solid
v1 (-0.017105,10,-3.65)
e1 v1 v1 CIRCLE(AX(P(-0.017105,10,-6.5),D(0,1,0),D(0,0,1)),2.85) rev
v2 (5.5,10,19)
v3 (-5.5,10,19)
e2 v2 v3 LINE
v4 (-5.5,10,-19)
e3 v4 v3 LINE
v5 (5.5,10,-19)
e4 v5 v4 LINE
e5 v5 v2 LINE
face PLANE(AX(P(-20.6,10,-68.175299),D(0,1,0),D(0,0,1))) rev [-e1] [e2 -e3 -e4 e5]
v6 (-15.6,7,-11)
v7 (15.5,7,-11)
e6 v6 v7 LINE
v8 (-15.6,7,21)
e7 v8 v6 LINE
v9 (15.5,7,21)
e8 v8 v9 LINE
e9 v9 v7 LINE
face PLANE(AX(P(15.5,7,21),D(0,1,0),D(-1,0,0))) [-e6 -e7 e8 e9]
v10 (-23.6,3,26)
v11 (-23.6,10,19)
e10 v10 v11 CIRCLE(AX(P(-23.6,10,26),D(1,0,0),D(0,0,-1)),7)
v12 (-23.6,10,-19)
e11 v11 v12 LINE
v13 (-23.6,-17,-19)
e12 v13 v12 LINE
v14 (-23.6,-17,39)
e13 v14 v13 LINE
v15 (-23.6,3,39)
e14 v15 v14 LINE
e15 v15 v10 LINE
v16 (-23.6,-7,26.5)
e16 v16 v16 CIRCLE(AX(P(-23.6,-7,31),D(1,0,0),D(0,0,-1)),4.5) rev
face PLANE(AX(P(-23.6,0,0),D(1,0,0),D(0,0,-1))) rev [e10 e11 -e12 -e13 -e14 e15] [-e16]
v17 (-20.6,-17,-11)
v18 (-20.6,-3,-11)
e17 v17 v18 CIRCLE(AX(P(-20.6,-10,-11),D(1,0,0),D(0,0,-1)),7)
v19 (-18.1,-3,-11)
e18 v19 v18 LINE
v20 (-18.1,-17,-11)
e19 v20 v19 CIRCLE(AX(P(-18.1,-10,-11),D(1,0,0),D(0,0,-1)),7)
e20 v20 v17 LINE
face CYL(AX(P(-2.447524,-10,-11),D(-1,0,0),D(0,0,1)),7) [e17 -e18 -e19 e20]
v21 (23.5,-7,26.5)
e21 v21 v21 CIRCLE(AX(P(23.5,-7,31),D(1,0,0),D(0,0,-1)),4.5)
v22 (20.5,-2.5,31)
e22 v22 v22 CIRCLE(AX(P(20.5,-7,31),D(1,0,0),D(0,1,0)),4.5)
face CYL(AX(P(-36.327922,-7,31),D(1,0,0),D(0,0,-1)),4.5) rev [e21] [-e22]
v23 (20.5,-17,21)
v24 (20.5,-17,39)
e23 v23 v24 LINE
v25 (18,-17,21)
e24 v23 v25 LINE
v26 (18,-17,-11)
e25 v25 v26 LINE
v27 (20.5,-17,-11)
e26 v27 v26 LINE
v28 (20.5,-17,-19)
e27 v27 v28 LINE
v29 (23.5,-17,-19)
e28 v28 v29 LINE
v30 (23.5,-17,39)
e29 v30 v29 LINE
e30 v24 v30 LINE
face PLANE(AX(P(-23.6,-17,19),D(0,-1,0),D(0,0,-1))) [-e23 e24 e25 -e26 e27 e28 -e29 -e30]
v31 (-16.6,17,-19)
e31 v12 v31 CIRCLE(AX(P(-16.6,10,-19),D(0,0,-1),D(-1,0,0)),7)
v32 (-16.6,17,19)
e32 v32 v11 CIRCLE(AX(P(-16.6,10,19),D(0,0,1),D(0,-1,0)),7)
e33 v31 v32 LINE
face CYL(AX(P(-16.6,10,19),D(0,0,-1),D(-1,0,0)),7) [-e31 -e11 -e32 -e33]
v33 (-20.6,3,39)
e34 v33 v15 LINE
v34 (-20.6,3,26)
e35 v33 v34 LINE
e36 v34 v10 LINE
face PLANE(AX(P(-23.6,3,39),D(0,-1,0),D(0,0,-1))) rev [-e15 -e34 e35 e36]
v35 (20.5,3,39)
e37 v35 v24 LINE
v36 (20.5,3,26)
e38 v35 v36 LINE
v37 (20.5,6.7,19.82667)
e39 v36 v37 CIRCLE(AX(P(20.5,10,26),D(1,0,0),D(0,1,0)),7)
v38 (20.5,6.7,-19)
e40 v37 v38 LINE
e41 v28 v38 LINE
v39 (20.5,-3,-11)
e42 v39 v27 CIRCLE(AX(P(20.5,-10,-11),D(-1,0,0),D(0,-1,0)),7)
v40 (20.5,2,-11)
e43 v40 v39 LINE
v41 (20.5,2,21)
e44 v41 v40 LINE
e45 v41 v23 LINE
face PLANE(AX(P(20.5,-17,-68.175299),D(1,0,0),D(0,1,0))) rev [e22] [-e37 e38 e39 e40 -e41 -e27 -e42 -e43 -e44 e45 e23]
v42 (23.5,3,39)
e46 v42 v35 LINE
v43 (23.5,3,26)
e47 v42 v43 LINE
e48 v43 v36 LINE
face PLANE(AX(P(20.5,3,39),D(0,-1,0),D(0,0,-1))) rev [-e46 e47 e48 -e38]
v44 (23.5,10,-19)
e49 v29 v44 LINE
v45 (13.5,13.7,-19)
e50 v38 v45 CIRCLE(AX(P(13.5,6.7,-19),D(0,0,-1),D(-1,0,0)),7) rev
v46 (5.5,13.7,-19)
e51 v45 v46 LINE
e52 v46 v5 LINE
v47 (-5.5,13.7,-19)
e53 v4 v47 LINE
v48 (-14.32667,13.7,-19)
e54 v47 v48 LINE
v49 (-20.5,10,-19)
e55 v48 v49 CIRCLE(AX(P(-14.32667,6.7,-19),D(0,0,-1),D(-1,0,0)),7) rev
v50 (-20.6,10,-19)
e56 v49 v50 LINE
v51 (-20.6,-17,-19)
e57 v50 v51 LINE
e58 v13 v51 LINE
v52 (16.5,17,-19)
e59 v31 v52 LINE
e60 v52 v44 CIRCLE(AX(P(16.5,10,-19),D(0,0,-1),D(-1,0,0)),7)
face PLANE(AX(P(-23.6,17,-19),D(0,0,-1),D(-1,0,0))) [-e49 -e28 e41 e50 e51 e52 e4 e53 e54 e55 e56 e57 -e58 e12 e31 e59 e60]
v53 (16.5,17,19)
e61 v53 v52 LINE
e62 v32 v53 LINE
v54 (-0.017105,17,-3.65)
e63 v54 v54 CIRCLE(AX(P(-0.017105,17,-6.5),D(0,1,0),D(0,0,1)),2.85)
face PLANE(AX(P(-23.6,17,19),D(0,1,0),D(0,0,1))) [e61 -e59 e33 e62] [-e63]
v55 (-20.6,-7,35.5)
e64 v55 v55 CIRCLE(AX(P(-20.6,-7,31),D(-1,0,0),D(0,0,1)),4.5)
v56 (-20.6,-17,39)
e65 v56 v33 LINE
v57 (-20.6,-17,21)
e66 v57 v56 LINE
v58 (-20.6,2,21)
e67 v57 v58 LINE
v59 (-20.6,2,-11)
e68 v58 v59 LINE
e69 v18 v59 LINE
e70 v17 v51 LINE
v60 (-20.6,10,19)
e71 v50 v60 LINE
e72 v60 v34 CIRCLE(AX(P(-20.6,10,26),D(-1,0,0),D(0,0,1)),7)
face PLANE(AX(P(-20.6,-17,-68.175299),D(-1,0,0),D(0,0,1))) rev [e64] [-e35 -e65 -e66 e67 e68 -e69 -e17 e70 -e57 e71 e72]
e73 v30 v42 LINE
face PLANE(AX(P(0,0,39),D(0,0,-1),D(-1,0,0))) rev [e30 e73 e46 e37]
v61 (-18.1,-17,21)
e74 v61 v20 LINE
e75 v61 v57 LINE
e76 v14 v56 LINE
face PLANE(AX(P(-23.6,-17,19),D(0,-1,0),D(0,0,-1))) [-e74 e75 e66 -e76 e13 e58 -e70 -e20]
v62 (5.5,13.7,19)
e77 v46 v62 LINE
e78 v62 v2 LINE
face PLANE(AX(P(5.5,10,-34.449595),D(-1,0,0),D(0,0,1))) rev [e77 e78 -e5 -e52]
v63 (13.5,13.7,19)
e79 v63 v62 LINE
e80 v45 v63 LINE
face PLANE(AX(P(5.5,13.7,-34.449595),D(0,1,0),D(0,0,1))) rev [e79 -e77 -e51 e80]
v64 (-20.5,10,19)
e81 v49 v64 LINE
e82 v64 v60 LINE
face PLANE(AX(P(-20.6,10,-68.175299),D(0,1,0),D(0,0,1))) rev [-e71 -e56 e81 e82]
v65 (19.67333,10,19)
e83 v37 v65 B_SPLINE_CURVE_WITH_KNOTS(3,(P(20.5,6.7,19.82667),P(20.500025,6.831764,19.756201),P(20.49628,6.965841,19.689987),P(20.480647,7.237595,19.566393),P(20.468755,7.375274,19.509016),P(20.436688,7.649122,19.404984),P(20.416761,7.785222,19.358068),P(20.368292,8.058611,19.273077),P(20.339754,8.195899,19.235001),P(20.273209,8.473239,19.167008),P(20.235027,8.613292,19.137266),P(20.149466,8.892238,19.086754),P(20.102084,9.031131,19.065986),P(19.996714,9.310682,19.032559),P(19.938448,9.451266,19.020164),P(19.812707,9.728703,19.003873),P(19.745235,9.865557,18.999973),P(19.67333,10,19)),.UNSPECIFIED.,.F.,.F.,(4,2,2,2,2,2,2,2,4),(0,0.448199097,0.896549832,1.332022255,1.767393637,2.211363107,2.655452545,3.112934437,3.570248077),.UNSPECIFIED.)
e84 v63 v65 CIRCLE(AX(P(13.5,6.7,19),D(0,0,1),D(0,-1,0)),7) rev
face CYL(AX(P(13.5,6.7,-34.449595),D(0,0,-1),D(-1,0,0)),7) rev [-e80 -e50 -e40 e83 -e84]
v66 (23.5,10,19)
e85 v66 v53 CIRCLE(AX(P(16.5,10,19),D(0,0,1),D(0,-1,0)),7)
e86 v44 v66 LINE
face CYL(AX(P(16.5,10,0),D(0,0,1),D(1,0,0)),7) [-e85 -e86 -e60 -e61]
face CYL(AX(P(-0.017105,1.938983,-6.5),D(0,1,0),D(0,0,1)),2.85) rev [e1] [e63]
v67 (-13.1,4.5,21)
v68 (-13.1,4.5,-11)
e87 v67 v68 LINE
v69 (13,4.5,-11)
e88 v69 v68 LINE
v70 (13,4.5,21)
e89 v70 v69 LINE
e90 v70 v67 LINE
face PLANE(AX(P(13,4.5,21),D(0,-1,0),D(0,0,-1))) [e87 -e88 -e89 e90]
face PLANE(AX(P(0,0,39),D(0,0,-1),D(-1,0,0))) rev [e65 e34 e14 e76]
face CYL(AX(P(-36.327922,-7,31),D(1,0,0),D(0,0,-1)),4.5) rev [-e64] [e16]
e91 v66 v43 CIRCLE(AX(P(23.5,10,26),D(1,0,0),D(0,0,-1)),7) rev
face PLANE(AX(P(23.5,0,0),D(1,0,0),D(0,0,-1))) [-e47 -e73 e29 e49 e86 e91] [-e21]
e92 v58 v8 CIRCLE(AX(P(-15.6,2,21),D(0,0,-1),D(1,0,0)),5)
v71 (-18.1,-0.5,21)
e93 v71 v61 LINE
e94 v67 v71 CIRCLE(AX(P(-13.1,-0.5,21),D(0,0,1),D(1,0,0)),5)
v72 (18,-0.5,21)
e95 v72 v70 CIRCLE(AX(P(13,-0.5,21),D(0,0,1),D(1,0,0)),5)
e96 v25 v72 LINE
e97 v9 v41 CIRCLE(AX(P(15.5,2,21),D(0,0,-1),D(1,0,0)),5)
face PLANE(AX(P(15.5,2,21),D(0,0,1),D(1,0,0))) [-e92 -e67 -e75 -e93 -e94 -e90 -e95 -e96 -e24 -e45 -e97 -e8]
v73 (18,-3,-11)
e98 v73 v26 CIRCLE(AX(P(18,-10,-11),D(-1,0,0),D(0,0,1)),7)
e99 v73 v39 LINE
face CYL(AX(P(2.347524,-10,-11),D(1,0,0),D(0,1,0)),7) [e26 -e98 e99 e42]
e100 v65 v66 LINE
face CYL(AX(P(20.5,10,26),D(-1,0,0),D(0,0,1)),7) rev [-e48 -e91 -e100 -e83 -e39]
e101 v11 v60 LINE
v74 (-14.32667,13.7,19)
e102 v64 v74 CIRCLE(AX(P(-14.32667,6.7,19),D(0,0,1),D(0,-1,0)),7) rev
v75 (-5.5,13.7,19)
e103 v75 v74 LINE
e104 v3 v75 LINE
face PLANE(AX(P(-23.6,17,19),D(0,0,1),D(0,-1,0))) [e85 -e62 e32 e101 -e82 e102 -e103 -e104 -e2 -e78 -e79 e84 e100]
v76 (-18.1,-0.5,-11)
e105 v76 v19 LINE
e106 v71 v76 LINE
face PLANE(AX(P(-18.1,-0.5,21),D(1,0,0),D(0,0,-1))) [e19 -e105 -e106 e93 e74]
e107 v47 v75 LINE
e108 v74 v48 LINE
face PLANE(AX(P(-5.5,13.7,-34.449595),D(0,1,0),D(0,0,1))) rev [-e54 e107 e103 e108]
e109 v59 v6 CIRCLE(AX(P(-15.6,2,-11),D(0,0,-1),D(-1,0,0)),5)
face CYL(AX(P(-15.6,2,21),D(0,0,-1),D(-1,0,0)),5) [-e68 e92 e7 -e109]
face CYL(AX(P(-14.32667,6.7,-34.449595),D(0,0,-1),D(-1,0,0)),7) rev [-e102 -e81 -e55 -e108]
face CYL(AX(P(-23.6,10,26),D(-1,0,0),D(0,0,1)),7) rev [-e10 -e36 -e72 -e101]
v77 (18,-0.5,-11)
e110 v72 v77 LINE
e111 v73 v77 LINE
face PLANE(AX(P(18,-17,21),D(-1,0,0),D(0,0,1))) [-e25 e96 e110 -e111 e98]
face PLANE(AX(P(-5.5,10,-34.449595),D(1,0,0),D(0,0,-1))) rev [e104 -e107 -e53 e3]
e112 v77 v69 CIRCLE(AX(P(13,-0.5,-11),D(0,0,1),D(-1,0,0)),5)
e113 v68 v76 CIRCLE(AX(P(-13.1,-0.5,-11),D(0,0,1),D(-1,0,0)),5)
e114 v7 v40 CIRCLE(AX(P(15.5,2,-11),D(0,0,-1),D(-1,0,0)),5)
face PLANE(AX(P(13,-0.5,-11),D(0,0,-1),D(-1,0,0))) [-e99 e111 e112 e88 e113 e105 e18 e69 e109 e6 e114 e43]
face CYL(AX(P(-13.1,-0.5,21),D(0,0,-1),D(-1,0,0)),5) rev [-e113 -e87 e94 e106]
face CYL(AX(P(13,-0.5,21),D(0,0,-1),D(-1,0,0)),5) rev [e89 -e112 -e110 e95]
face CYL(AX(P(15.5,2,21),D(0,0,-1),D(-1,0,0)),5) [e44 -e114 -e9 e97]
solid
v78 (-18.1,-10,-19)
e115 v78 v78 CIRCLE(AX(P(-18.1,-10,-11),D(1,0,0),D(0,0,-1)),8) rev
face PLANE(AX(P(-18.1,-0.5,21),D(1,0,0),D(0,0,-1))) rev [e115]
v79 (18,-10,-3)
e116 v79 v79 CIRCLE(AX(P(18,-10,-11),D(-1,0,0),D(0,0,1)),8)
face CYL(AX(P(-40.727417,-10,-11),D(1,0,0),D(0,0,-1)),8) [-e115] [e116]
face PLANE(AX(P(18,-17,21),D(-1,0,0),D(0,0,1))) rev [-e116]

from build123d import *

# Parameters (mm, degrees)
BOSS_EXTRUDE1_DEPTH             = 23.5
BOSS_EXTRUDE1_DEPTH_BACK        = 23.6
SKETCH1_W                       = 38
SKETCH1_H                       = 34
SKETCH2_W                       = 41.1
SKETCH2_H                       = 27
CUT_EXTRUDE1_DEPTH              = 38
FILLET1_R                       = 7
SKETCH3_W                       = 15
SKETCH3_H                       = 3.7
CUT_EXTRUDE2_DEPTH              = 38
FILLET2_R                       = 7
SKETCH4_W                       = 3
SKETCH4_H                       = 20
BOSS_EXTRUDE2_DEPTH             = 20
FILLET3_R                       = 7
CUT_EXTRUDE3_REACH              = 50.651
SKETCH5_R                       = 4.5
CUT_EXTRUDE3_DIRECTION_2_REACH  = 50.651
BOSS_EXTRUDE3_DEPTH             = 40
CUT_EXTRUDE4_DEPTH              = 8
BOSS_EXTRUDE4_DEPTH             = 2.5
BOSS_EXTRUDE5_START             = 2.5
BOSS_EXTRUDE5_DEPTH             = 2.5
BOSS_EXTRUDE6_REACH             = 50.651
SKETCH11_R                      = 8
BOSS_EXTRUDE6_DIRECTION_2_REACH = 50.651
SKETCH12_R                      = 2.85
CUT_EXTRUDE5_DEPTH              = 7


with BuildPart() as part:
    # Sketch1 → Boss-Extrude1 (new, two sides: drawn at the far end of the back side and taken through both)
    with BuildSketch(Plane(origin=(0, 0, 0), x_dir=(0, 0, -1), z_dir=(1, 0, 0)).offset(-BOSS_EXTRUDE1_DEPTH_BACK)):
        Rectangle(SKETCH1_W, SKETCH1_H)
    extrude(amount=BOSS_EXTRUDE1_DEPTH + BOSS_EXTRUDE1_DEPTH_BACK)

    # Sketch2 → Cut-Extrude1 (cut)
    with BuildSketch(Plane.XY.offset(19)):
        with Locations((-0.05, -3.5)):
            Rectangle(SKETCH2_W, SKETCH2_H)
    extrude(amount=-CUT_EXTRUDE1_DEPTH, mode=Mode.SUBTRACT)

    # Fillet1
    fillet1_edges = [part.edges().sort_by_distance(p)[0] for p in [
        (23.5, 17, 0),
        (-23.6, 17, 0),
    ]]
    fillet(fillet1_edges, radius=FILLET1_R)

    # Sketch3 → Cut-Extrude2 (cut)
    with BuildSketch(Plane.XY.offset(19)):
        with Locations((13, 11.85)):
            Rectangle(SKETCH3_W, SKETCH3_H)
        with Locations((-13, 11.85)):
            Rectangle(SKETCH3_W, SKETCH3_H)
    extrude(amount=-CUT_EXTRUDE2_DEPTH, mode=Mode.SUBTRACT)

    # Fillet2
    # the kernel refuses this fillet: 7 mm, written as the material it adds along each edge
    with BuildSketch(Plane(origin=(-20.5, 13.7, 19), x_dir=(1, 0, 0), z_dir=(0, 0, -1))) as fillet2_piece_1:
        with BuildLine():
            CenterArc((6.173329734, 7), FILLET2_R, 208.127068219, 61.872931781)
            Line((0, 3.7), (-0.123466595, 3.634))
            ThreePointArc((-0.123466595, 3.634), (-0.14, 1.85), (-0.14, 0))
            Line((-0.14, 0), (0, -0.14))
            Line((0, -0.14), (6.173329734, -0.14))
            Line((6.173329734, -0.14), (6.173329734, 0))
        make_face()
    extrude(amount=38)
    with BuildSketch(Plane(origin=(20.5, 13.7, 19), x_dir=(0, -1, 0), z_dir=(0, 0, -1))) as fillet2_piece_2:
        with BuildLine():
            CenterArc((FILLET2_R, FILLET2_R), FILLET2_R, 180, 90)
            Line((0, FILLET2_R), (-FILLET2_R * 0.02, FILLET2_R))
            Line((-FILLET2_R * 0.02, FILLET2_R), (-FILLET2_R * 0.02, -FILLET2_R * 0.02))
            Line((-FILLET2_R * 0.02, -FILLET2_R * 0.02), (FILLET2_R, -FILLET2_R * 0.02))
            Line((FILLET2_R, -FILLET2_R * 0.02), (FILLET2_R, 0))
        make_face()
    extrude(amount=38)

    # Sketch4 → Boss-Extrude2 (add)
    with BuildSketch(Plane.XY.offset(19)):
        with Locations((-22.1, -7)):
            Rectangle(SKETCH4_W, SKETCH4_H)
        with Locations((22, -7)):
            Rectangle(SKETCH4_W, SKETCH4_H)
    extrude(amount=BOSS_EXTRUDE2_DEPTH)

    # Fillet3
    fillet3_edges = [part.edges().sort_by_distance(p)[0] for p in [
        (-22.1, 3, 19),
        (22, 3, 19),
    ]]
    fillet(fillet3_edges, radius=FILLET3_R)

    # Cut-Extrude3: up to this face of the body (flat: up to its plane)
    cut_extrude3_end = Plane(part.part.faces().sort_by_distance((-23.6, -4.415554034, 8.225623848))[0])
    # Sketch5 → Cut-Extrude3 (cut, up to the picked face)
    with BuildSketch(Plane(origin=(0, 0, 0), x_dir=(0, 0, -1), z_dir=(1, 0, 0)), mode=Mode.PRIVATE) as cut_extrude3_sk1:
        with Locations((-31, -7)):
            Circle(SKETCH5_R)
    cut_extrude3_tool1 = split(extrude(cut_extrude3_sk1.sketch, amount=-CUT_EXTRUDE3_REACH, mode=Mode.PRIVATE), bisect_by=cut_extrude3_end, keep=Keep.BOTH, mode=Mode.PRIVATE)
    add(cut_extrude3_tool1.solids().sort_by(Axis((0, -7, 31), (-1, 0, 0)))[0], mode=Mode.SUBTRACT)

    # Cut-Extrude3 direction 2: up to this face of the body (flat: up to its plane)
    cut_extrude3_direction_2_end = Plane(part.part.faces().sort_by_distance((23.5, -4.415554034, 8.225623848))[0])
    # Sketch5 → Cut-Extrude3 direction 2 (cut, up to the picked face)
    with BuildSketch(Plane(origin=(0, 0, 0), x_dir=(0, 0, -1), z_dir=(1, 0, 0)), mode=Mode.PRIVATE) as cut_extrude3_direction_2_sk1:
        with Locations((-31, -7)):
            Circle(SKETCH5_R)
    cut_extrude3_direction_2_tool1 = split(extrude(cut_extrude3_direction_2_sk1.sketch, amount=CUT_EXTRUDE3_DIRECTION_2_REACH, mode=Mode.PRIVATE), bisect_by=cut_extrude3_direction_2_end, keep=Keep.BOTH, mode=Mode.PRIVATE)
    add(cut_extrude3_direction_2_tool1.solids().sort_by(Axis((0, -7, 31), (1, 0, 0)))[0], mode=Mode.SUBTRACT)

    # Sketch6 → Boss-Extrude3 (add)
    with BuildSketch(Plane(origin=(0, 0, -19), x_dir=(-1, 0, 0), z_dir=(0, 0, -1))):
        with BuildLine():
            Line((-20.5, -17), (-18, -17))
            Line((-18, -17), (-18, -0.5))
            ThreePointArc((-18, -0.5), (-16.535533906, 3.035533906), (-13, 4.5))
            Line((-13, 4.5), (13.1, 4.5))
            ThreePointArc((13.1, 4.5), (16.635533906, 3.035533906), (18.1, -0.5))
            Line((18.1, -0.5), (18.1, -17))
            Line((18.1, -17), (20.6, -17))
            Line((20.6, -17), (20.6, 2))
            ThreePointArc((20.6, 2), (19.135533906, 5.535533906), (15.6, 7))
            Line((15.6, 7), (-15.5, 7))
            ThreePointArc((-15.5, 7), (-19.035533906, 5.535533906), (-20.5, 2))
            Line((-20.5, 2), (-20.5, -17))
        make_face()
    extrude(amount=-BOSS_EXTRUDE3_DEPTH)

    # Sketch7 → Cut-Extrude4 (cut)
    with BuildSketch(Plane(origin=(0, 0, -19), x_dir=(-1, 0, 0), z_dir=(0, 0, -1))):
        with BuildLine():
            Line((-20.5, 2), (-20.5, -17))
            Line((-20.5, -17), (-18, -17))
            Line((-18, -17), (-18, -0.5))
            ThreePointArc((-18, -0.5), (-16.535533906, 3.035533906), (-13, 4.5))
            Line((-13, 4.5), (13.1, 4.5))
            ThreePointArc((13.1, 4.5), (16.635533906, 3.035533906), (18.1, -0.5))
            Line((18.1, -0.5), (18.1, -17))
            Line((18.1, -17), (20.6, -17))
            Line((20.6, -17), (20.6, 2))
            ThreePointArc((20.6, 2), (19.135533906, 5.535533906), (15.6, 7))
            Line((15.6, 7), (-15.5, 7))
            ThreePointArc((-15.5, 7), (-19.035533906, 5.535533906), (-20.5, 2))
        make_face()
    extrude(amount=-CUT_EXTRUDE4_DEPTH, mode=Mode.SUBTRACT)

    # Sketch8 → Boss-Extrude4 (add)
    with BuildSketch(Plane(origin=(-20.6, 0, 0), x_dir=(0, 0, -1), z_dir=(1, 0, 0))):
        with BuildLine():
            Line((11, -17), (11, -3))
            ThreePointArc((11, -3), (18, -10), (11, -17))
        make_face()
    extrude(amount=BOSS_EXTRUDE4_DEPTH)

    # Sketch9 → Boss-Extrude5 (add)
    with BuildSketch(Plane.ZY.offset(-20.5).offset(BOSS_EXTRUDE5_START)):
        with BuildLine():
            Line((-11, -17), (-11, -3))
            ThreePointArc((-11, -3), (-18, -10), (-11, -17))
        make_face()
    extrude(amount=-BOSS_EXTRUDE5_DEPTH)


with BuildPart() as body_2:

    # Boss-Extrude6: up to this face of the body (flat: up to its plane)
    boss_extrude6_end = Plane(part.part.faces().sort_by_distance((-18.1, -8.909035044, 2.586370643))[0])
    # Sketch11 → Boss-Extrude6 (new, up to the picked face)
    with BuildSketch(Plane(origin=(0, 0, 0), x_dir=(0, 0, -1), z_dir=(1, 0, 0)), mode=Mode.PRIVATE) as boss_extrude6_sk1:
        with Locations((11, -10)):
            Circle(SKETCH11_R)
    boss_extrude6_tool1 = split(extrude(boss_extrude6_sk1.sketch, amount=-BOSS_EXTRUDE6_REACH, mode=Mode.PRIVATE), bisect_by=boss_extrude6_end, keep=Keep.BOTH, mode=Mode.PRIVATE)
    add(boss_extrude6_tool1.solids().sort_by(Axis((0, -10, -11), (-1, 0, 0)))[0])


    # Boss-Extrude6 direction 2: up to this face of the body (flat: up to its plane)
    boss_extrude6_direction_2_end = Plane(part.part.faces().sort_by_distance((18, -8.909035044, 2.586370643))[0])
    # Sketch11 → Boss-Extrude6 direction 2 (add, up to the picked face)
    with BuildSketch(Plane(origin=(0, 0, 0), x_dir=(0, 0, -1), z_dir=(1, 0, 0)), mode=Mode.PRIVATE) as boss_extrude6_direction_2_sk1:
        with Locations((11, -10)):
            Circle(SKETCH11_R)
    boss_extrude6_direction_2_tool1 = split(extrude(boss_extrude6_direction_2_sk1.sketch, amount=BOSS_EXTRUDE6_DIRECTION_2_REACH, mode=Mode.PRIVATE), bisect_by=boss_extrude6_direction_2_end, keep=Keep.BOTH, mode=Mode.PRIVATE)
    add(boss_extrude6_direction_2_tool1.solids().sort_by(Axis((0, -10, -11), (1, 0, 0)))[0])


with BuildPart() as part_1:
    add(part.part)

    # Sketch12 → Cut-Extrude5 (cut)
    with BuildSketch(Plane(origin=(0, 17, 0), x_dir=(1, 0, 0), z_dir=(0, 1, 0))):
        with Locations(Location((-0.017105263, 6.5, 0), (0, 0, 270))):
            Circle(SKETCH12_R)
    extrude(amount=-CUT_EXTRUDE5_DEPTH, mode=Mode.SUBTRACT)


solid = Compound([body_2.part, part_1.part])
